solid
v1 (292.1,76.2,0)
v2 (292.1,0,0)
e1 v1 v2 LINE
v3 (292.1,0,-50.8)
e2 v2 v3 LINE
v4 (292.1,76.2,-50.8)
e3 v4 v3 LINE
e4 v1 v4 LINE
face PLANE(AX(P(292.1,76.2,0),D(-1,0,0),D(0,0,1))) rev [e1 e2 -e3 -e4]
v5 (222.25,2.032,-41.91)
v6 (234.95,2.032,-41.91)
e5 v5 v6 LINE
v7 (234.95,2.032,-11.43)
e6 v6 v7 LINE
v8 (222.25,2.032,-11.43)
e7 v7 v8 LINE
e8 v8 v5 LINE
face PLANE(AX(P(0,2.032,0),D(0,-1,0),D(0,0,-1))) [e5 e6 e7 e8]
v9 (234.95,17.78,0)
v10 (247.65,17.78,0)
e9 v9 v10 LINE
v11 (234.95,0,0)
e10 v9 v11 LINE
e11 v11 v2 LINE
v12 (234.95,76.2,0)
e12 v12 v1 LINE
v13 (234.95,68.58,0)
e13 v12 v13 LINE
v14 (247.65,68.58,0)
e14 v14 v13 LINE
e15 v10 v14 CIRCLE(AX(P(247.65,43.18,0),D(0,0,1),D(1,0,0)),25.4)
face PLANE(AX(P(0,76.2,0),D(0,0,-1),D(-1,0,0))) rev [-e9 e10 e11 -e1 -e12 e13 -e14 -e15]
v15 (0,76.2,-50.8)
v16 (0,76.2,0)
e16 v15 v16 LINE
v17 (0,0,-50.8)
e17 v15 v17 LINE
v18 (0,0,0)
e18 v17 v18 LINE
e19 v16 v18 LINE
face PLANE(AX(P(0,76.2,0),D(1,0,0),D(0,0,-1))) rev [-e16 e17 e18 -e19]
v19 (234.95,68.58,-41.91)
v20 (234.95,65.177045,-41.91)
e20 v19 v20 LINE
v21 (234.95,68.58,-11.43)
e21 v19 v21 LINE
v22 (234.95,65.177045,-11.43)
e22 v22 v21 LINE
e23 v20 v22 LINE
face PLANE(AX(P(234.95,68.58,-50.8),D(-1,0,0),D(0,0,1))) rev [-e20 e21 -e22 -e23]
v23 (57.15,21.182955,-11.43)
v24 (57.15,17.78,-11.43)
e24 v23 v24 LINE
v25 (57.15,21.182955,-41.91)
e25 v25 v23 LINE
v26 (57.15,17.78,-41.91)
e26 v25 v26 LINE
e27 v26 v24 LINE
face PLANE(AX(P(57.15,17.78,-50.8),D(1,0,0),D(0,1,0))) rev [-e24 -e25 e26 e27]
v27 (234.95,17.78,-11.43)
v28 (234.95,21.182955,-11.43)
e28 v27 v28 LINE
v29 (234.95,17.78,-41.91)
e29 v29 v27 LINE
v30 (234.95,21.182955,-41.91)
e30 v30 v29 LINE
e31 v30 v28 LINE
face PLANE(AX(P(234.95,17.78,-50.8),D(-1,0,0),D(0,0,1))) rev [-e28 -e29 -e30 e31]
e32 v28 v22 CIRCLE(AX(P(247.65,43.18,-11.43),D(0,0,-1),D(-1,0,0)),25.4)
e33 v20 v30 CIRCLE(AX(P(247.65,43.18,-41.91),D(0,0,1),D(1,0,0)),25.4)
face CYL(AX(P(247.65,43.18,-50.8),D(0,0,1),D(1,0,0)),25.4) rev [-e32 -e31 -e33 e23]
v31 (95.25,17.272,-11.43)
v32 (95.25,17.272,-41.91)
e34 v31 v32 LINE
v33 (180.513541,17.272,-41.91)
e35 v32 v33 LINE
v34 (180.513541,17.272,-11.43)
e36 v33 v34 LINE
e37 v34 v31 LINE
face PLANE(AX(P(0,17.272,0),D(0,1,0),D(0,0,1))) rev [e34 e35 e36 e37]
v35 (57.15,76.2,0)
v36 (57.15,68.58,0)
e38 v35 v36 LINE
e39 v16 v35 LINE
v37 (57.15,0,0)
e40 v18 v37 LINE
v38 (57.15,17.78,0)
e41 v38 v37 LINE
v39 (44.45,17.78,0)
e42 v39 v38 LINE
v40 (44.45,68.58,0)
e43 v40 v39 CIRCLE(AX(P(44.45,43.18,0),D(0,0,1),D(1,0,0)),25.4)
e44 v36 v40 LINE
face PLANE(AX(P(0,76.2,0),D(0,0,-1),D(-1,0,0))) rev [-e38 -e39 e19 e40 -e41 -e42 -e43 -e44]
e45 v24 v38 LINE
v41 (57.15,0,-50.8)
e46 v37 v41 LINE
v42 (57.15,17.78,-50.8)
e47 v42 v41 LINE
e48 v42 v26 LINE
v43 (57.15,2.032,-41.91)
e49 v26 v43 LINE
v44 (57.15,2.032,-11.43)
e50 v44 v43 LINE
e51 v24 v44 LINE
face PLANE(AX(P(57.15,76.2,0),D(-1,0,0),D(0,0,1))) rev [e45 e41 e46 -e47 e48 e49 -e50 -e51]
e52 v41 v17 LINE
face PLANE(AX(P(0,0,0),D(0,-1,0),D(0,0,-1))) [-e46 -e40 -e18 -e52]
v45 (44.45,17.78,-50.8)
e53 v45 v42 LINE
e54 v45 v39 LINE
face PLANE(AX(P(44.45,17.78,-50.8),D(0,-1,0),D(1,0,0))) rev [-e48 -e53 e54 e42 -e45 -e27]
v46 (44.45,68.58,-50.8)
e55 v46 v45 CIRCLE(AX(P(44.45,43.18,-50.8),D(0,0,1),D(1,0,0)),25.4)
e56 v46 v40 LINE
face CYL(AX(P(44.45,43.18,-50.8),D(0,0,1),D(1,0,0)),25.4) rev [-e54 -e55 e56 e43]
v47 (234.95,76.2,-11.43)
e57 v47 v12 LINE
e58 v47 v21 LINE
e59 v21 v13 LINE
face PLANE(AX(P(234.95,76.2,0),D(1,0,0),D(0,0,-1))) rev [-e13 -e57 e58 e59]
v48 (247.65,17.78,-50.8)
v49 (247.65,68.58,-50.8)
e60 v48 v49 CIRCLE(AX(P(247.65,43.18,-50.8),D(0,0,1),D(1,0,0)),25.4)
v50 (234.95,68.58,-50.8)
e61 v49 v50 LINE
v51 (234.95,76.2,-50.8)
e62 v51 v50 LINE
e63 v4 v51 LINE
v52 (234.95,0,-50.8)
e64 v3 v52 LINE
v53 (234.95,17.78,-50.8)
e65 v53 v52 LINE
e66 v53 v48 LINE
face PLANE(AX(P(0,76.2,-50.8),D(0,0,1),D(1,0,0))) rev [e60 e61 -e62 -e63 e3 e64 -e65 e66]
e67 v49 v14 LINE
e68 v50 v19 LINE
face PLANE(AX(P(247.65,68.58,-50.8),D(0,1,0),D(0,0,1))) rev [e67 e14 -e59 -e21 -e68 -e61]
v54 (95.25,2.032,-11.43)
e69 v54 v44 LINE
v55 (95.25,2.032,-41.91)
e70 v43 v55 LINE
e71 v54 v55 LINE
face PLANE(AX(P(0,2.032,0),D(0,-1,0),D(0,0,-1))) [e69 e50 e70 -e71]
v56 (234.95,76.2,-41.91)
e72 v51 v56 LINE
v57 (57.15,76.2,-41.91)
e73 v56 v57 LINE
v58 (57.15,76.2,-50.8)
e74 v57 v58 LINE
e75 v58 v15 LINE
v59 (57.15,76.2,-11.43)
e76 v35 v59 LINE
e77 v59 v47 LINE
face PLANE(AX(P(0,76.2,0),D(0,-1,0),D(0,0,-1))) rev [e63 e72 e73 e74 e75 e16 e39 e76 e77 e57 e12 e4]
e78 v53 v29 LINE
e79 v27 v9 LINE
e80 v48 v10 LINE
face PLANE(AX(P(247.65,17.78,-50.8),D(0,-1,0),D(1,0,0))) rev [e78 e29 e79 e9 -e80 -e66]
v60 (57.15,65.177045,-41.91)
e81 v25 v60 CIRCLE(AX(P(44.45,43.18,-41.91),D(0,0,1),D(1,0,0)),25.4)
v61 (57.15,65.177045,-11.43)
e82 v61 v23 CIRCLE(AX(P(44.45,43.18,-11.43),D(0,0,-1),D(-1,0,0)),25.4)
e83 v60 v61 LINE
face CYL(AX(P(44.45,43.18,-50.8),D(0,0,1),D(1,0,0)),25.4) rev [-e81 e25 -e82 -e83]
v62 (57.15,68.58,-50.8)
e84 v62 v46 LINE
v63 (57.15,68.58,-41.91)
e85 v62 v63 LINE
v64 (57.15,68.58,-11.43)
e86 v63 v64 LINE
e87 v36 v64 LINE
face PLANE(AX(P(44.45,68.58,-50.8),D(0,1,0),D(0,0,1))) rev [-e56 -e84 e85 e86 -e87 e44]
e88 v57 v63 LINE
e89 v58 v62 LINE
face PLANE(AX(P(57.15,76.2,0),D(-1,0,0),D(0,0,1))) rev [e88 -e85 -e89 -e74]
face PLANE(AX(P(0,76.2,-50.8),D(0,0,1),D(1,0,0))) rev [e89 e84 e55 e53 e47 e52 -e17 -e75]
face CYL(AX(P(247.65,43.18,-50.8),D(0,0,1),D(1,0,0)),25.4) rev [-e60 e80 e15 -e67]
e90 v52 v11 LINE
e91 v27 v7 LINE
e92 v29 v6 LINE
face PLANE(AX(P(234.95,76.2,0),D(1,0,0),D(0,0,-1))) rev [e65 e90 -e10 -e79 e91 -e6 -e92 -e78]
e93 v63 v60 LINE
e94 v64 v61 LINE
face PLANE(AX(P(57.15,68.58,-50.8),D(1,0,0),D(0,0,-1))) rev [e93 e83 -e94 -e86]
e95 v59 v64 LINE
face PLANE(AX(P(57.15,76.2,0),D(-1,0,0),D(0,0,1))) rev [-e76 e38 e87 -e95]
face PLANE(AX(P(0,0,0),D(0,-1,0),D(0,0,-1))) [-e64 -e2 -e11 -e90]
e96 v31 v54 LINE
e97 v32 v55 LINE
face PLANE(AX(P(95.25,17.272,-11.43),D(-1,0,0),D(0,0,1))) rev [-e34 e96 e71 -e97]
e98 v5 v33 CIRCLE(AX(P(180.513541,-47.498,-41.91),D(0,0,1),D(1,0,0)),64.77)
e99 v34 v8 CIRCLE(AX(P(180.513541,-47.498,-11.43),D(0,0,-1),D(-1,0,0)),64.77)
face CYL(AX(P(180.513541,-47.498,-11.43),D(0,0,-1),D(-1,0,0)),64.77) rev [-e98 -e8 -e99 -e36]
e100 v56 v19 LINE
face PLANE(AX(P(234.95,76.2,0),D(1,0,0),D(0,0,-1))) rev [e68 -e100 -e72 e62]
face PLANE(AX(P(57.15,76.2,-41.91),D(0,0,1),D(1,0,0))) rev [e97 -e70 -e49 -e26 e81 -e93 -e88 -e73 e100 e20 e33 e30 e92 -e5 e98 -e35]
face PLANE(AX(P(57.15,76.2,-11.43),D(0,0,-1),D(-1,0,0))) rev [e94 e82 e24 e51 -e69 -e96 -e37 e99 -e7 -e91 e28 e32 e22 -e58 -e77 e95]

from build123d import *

# Parameters (mm, degrees)
SKETCH1_W           = 292.1
SKETCH1_H           = 50.8
BOSS_EXTRUDE1_DEPTH = 76.2
SKETCH2_W           = 177.8
SKETCH2_H           = 11.43
SKETCH2_H_2         = 8.89
CUT_EXTRUDE1_DEPTH  = 307.120058147
SKETCH3_W           = 177.8
SKETCH3_H           = 30.48
CUT_EXTRUDE2_DEPTH  = 2.032
SKETCH4_W           = 139.7
SKETCH4_H           = 30.48
CUT_EXTRUDE3_DEPTH  = 15.24
SKETCH5_W           = 12.7
SKETCH5_H           = 30.48
BOSS_EXTRUDE2_DEPTH = 15.24
FILLET1_R           = 64.77
CUT_EXTRUDE4_DEPTH  = 307.120058147
CUT_EXTRUDE5_DEPTH  = 307.120058147


with BuildPart() as part:
    # Sketch1 → Boss-Extrude1 (new body)
    with BuildSketch(Plane(origin=(0, 0, 0), x_dir=(1, 0, 0), z_dir=(0, 1, 0))):
        with Locations((146.05, 25.4)):
            Rectangle(SKETCH1_W, SKETCH1_H)
    extrude(amount=BOSS_EXTRUDE1_DEPTH)

    # Sketch2 → Cut-Extrude1 (cut, through all)
    with BuildSketch(Plane.XZ):
        with Locations((146.05, -5.715)):
            Rectangle(SKETCH2_W, SKETCH2_H)
        with Locations((146.05, -46.355)):
            Rectangle(SKETCH2_W, SKETCH2_H_2)
    extrude(amount=-CUT_EXTRUDE1_DEPTH, mode=Mode.SUBTRACT)

    # Sketch3 → Cut-Extrude2 (cut)
    with BuildSketch(Plane.XZ):
        with Locations((146.05, -26.67)):
            Rectangle(SKETCH3_W, SKETCH3_H)
    extrude(amount=-CUT_EXTRUDE2_DEPTH, mode=Mode.SUBTRACT)

    # Sketch4 → Cut-Extrude3 (cut)
    with BuildSketch(Plane.XZ.offset(-2.032)):
        with Locations((165.1, -26.67)):
            Rectangle(SKETCH4_W, SKETCH4_H)
    extrude(amount=-CUT_EXTRUDE3_DEPTH, mode=Mode.SUBTRACT)

    # Sketch5 → Boss-Extrude2 (add)
    with BuildSketch(Plane.XZ.offset(-17.272)):
        with Locations((228.6, -26.67)):
            Rectangle(SKETCH5_W, SKETCH5_H)
    extrude(amount=BOSS_EXTRUDE2_DEPTH)

    # Fillet1
    # the kernel refuses this fillet: 64.77 mm, written as the material it adds along each edge
    with BuildSketch(Plane(origin=(222.25, 17.272, -41.91), x_dir=(0, -1, 0), z_dir=(0, 0, 1))) as fillet1_piece_1:
        with BuildLine():
            CenterArc((64.77, -41.736458882), FILLET1_R, 139.880833102, 40.119166898)
            Line((0, -41.736458882), (-1.2954, -41.736458882))
            Line((-1.2954, -41.736458882), (-1.2954, 0))
            Line((-1.2954, 0), (0, 1.2954))
            ThreePointArc((0, 1.2954), (7.62, 1.2954), (14.2494, 0.834729178))
            Line((14.2494, 0.834729178), (15.24, 0))
        make_face()
    extrude(amount=30.48)

    # Sketch6 → Cut-Extrude4 (cut, through all)
    with BuildSketch(Plane.XY):
        with BuildLine():
            Line((44.45, 17.78), (57.15, 17.78))
            Line((57.15, 17.78), (57.15, 21.182954744))
            ThreePointArc((57.15, 21.182954744), (69.85, 43.18), (57.15, 65.177045256))
            Line((57.15, 65.177045256), (57.15, 68.58))
            Line((57.15, 68.58), (44.45, 68.58))
            ThreePointArc((44.45, 68.58), (19.05, 43.18), (44.45, 17.78))
        make_face()
    extrude(amount=-CUT_EXTRUDE4_DEPTH, mode=Mode.SUBTRACT)

    # Sketch7 → Cut-Extrude5 (cut, through all)
    with BuildSketch(Plane.XY):
        with BuildLine():
            Line((247.65, 17.78), (234.95, 17.78))
            Line((234.95, 17.78), (234.95, 21.182954744))
            ThreePointArc((234.95, 21.182954744), (222.25, 43.18), (234.95, 65.177045256))
            Line((234.95, 65.177045256), (234.95, 68.58))
            Line((234.95, 68.58), (247.65, 68.58))
            ThreePointArc((247.65, 68.58), (273.05, 43.18), (247.65, 17.78))
        make_face()
    extrude(amount=-CUT_EXTRUDE5_DEPTH, mode=Mode.SUBTRACT)


solid = part.part
